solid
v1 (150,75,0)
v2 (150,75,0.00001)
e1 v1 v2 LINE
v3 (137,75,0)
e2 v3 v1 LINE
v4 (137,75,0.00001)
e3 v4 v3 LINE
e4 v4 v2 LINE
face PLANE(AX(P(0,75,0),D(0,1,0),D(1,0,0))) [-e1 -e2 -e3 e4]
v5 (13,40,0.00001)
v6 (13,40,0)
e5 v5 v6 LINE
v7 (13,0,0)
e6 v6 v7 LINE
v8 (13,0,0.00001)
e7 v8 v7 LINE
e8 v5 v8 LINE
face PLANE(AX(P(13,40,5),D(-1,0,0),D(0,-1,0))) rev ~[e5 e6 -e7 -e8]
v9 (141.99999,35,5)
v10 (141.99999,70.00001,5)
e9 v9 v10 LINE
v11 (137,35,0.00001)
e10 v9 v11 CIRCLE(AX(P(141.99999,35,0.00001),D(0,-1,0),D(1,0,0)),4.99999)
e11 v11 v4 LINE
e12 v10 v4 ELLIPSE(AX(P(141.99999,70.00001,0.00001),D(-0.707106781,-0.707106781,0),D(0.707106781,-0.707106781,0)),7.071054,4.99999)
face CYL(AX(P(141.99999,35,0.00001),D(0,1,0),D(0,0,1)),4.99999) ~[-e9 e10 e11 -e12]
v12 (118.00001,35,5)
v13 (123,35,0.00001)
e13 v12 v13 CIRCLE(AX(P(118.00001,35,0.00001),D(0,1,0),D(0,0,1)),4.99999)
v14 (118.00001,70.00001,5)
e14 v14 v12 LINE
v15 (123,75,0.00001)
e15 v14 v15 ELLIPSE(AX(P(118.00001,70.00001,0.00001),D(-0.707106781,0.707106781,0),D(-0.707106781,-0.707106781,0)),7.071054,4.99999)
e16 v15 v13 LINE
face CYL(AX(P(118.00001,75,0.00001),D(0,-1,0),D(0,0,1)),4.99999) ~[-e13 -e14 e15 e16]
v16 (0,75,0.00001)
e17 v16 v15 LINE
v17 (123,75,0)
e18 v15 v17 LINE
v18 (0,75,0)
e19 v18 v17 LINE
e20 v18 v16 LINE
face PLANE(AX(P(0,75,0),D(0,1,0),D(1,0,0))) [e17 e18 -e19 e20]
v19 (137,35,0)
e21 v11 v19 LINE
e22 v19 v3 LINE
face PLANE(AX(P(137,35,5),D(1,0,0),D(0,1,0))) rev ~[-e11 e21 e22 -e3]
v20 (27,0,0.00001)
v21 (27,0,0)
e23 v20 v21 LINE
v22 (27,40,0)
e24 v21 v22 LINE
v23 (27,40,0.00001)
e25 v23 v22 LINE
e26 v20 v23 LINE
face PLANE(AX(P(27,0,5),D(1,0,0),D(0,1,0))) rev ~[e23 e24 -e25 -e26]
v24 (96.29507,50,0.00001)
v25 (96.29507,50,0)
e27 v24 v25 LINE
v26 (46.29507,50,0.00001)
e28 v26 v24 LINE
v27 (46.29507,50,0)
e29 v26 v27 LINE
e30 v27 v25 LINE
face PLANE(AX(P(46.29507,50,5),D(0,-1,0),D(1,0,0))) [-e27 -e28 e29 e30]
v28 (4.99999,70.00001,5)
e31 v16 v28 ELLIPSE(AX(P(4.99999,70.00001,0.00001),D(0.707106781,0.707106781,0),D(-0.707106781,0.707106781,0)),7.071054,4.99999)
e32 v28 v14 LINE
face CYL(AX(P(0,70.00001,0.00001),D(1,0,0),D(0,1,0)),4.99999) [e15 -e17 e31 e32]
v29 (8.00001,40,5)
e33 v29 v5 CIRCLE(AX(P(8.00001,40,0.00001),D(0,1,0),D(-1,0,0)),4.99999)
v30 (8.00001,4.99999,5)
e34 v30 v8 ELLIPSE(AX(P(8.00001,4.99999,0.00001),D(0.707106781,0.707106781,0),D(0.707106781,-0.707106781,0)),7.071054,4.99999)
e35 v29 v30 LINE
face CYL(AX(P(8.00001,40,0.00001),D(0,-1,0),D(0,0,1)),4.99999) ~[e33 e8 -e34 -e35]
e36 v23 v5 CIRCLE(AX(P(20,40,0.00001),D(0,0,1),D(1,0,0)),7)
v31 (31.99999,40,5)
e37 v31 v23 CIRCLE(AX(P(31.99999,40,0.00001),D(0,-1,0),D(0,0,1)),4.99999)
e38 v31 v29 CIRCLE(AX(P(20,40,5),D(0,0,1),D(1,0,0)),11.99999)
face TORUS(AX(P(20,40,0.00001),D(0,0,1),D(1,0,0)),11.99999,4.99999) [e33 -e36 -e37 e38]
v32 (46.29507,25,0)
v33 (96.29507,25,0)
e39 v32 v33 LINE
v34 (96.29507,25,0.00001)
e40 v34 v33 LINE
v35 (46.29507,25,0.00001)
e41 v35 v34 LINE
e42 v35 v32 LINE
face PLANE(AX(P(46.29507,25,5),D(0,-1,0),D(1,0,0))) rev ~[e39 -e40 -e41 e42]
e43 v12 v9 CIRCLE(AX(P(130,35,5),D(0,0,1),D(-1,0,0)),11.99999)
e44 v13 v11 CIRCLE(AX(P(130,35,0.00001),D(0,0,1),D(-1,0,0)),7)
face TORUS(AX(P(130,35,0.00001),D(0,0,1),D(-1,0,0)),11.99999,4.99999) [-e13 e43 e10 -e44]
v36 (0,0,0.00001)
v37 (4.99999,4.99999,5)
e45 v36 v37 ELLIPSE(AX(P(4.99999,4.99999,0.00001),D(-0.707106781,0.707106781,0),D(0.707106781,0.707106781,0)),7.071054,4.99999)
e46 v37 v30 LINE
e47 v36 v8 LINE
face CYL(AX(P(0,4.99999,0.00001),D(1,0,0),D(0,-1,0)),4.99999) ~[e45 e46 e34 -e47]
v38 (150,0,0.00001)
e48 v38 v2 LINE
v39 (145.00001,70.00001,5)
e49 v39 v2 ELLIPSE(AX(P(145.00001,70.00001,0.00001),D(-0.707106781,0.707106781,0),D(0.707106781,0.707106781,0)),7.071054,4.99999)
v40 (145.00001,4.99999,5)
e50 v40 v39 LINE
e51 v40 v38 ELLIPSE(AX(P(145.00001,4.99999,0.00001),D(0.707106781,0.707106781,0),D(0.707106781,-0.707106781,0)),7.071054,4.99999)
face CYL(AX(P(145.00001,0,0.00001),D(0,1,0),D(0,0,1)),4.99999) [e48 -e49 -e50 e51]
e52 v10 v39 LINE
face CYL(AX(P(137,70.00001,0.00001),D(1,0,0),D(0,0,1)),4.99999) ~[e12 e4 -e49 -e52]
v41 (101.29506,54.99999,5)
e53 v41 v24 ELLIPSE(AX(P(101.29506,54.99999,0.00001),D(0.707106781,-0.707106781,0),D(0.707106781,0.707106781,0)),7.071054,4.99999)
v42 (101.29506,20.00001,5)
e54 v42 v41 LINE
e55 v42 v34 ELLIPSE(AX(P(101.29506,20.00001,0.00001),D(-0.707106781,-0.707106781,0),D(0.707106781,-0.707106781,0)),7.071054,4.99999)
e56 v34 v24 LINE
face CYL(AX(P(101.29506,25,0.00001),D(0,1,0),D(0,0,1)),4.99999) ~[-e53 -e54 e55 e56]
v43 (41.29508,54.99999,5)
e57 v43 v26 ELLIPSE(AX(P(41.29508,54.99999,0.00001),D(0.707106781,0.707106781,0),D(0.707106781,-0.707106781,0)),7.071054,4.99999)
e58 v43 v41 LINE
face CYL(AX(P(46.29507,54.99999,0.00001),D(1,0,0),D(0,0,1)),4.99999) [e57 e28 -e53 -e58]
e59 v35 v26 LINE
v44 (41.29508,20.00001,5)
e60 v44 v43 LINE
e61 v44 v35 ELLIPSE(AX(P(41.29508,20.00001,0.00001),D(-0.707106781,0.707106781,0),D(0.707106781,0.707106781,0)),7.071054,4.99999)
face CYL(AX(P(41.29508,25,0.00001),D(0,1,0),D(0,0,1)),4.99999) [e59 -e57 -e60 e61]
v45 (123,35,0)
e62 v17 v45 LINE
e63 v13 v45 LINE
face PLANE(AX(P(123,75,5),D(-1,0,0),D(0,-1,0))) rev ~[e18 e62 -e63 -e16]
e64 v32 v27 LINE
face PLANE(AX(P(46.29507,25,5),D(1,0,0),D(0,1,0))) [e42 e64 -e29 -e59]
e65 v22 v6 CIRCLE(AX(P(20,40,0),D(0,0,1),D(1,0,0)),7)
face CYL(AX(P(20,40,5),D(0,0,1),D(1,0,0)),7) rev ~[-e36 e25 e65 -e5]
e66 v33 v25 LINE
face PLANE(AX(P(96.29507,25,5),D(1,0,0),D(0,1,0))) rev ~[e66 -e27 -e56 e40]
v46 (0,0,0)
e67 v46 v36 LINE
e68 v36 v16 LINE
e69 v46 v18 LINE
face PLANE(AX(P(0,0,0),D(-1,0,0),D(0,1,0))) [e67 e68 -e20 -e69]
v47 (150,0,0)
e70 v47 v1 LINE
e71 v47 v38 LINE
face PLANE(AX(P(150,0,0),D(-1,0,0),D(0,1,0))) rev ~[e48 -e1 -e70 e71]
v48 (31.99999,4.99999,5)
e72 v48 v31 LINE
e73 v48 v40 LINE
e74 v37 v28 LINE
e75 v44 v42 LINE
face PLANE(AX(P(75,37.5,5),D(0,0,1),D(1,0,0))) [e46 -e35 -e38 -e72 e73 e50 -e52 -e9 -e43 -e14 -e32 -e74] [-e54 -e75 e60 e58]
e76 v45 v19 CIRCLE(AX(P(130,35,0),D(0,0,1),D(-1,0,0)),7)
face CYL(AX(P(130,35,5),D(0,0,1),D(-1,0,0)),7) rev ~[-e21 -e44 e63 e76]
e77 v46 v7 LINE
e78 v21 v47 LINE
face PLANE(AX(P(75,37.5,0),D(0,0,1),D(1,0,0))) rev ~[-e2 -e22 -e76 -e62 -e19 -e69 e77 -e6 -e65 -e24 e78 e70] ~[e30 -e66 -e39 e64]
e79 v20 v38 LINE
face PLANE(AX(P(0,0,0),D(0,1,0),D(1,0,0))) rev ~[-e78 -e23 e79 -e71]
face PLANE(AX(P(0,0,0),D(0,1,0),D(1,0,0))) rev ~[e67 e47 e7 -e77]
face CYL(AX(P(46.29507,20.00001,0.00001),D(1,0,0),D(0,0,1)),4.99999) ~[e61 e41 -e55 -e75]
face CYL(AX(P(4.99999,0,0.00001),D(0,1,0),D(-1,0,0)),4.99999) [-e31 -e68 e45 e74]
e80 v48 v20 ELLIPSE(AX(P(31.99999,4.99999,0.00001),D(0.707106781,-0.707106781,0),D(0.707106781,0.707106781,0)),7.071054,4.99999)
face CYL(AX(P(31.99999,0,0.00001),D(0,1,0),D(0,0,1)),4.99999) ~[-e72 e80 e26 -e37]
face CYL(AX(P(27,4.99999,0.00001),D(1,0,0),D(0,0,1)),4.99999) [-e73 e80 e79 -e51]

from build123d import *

# Parameters (mm, degrees)
F0_W     = 150
F0_H     = 75
F1_DEPTH = 5
F3_DEPTH = 5.001
F5_DEPTH = 5.001
F6_W     = 50
F6_H     = 25
F7_DEPTH = 5.001
F8_R     = 4.99999


# Not quite as in the source:
# - a fillet or chamfer is up to 0.001 mm smaller than in the source, because OpenCascade refuses the exact size


with BuildPart() as f1:
    # F0 (on Top) → F1 (new body)
    with BuildSketch(Plane.XY):
        with Locations((75, 37.5)):
            Rectangle(F0_W, F0_H)
    extrude(amount=F1_DEPTH)

    # F2 (on face) → F3 (cut, through all)
    with BuildSketch(Plane.XY.offset(5)):
        with BuildLine():
            Line((13, 40), (13, 0))
            Line((13, 0), (27, 0))
            Line((27, 0), (27, 40))
            ThreePointArc((27, 40), (20, 47), (13, 40))
        make_face()
    extrude(amount=-F3_DEPTH, mode=Mode.SUBTRACT)

    # F4 (on face) → F5 (cut, through all)
    with BuildSketch(Plane.XY.offset(5)):
        with BuildLine():
            Line((137, 35), (137, 75))
            Line((137, 75), (123, 75))
            Line((123, 75), (123, 35))
            ThreePointArc((123, 35), (130, 28), (137, 35))
        make_face()
    extrude(amount=-F5_DEPTH, mode=Mode.SUBTRACT)

    # F6 (on face) → F7 (cut, through all)
    with BuildSketch(Plane.XY.offset(5)):
        with Locations((71.2950700867, 37.5)):
            Rectangle(F6_W, F6_H)
    extrude(amount=-F7_DEPTH, mode=Mode.SUBTRACT)

    # F8 (radius 5 in the source; OpenCascade refuses exactly that, so slightly less here)
    f8_edges = [f1.edges().sort_by_distance(p)[0] for p in [
        (88.5, 0, 5),
        (27, 20, 5),
        (150, 37.5, 5),
        (20, 47, 5),
        (143.5, 75, 5),
        (13, 20, 5),
        (137, 55, 5),
        (6.5, 0, 5),
        (130, 28, 5),
        (0, 37.5, 5),
        (123, 55, 5),
        (61.5, 75, 5),
        (71.29507, 50, 5),
        (46.29507, 37.5, 5),
        (71.29507, 25, 5),
        (96.29507, 37.5, 5),
    ]]
    fillet(f8_edges, radius=F8_R)


solid = f1.part
